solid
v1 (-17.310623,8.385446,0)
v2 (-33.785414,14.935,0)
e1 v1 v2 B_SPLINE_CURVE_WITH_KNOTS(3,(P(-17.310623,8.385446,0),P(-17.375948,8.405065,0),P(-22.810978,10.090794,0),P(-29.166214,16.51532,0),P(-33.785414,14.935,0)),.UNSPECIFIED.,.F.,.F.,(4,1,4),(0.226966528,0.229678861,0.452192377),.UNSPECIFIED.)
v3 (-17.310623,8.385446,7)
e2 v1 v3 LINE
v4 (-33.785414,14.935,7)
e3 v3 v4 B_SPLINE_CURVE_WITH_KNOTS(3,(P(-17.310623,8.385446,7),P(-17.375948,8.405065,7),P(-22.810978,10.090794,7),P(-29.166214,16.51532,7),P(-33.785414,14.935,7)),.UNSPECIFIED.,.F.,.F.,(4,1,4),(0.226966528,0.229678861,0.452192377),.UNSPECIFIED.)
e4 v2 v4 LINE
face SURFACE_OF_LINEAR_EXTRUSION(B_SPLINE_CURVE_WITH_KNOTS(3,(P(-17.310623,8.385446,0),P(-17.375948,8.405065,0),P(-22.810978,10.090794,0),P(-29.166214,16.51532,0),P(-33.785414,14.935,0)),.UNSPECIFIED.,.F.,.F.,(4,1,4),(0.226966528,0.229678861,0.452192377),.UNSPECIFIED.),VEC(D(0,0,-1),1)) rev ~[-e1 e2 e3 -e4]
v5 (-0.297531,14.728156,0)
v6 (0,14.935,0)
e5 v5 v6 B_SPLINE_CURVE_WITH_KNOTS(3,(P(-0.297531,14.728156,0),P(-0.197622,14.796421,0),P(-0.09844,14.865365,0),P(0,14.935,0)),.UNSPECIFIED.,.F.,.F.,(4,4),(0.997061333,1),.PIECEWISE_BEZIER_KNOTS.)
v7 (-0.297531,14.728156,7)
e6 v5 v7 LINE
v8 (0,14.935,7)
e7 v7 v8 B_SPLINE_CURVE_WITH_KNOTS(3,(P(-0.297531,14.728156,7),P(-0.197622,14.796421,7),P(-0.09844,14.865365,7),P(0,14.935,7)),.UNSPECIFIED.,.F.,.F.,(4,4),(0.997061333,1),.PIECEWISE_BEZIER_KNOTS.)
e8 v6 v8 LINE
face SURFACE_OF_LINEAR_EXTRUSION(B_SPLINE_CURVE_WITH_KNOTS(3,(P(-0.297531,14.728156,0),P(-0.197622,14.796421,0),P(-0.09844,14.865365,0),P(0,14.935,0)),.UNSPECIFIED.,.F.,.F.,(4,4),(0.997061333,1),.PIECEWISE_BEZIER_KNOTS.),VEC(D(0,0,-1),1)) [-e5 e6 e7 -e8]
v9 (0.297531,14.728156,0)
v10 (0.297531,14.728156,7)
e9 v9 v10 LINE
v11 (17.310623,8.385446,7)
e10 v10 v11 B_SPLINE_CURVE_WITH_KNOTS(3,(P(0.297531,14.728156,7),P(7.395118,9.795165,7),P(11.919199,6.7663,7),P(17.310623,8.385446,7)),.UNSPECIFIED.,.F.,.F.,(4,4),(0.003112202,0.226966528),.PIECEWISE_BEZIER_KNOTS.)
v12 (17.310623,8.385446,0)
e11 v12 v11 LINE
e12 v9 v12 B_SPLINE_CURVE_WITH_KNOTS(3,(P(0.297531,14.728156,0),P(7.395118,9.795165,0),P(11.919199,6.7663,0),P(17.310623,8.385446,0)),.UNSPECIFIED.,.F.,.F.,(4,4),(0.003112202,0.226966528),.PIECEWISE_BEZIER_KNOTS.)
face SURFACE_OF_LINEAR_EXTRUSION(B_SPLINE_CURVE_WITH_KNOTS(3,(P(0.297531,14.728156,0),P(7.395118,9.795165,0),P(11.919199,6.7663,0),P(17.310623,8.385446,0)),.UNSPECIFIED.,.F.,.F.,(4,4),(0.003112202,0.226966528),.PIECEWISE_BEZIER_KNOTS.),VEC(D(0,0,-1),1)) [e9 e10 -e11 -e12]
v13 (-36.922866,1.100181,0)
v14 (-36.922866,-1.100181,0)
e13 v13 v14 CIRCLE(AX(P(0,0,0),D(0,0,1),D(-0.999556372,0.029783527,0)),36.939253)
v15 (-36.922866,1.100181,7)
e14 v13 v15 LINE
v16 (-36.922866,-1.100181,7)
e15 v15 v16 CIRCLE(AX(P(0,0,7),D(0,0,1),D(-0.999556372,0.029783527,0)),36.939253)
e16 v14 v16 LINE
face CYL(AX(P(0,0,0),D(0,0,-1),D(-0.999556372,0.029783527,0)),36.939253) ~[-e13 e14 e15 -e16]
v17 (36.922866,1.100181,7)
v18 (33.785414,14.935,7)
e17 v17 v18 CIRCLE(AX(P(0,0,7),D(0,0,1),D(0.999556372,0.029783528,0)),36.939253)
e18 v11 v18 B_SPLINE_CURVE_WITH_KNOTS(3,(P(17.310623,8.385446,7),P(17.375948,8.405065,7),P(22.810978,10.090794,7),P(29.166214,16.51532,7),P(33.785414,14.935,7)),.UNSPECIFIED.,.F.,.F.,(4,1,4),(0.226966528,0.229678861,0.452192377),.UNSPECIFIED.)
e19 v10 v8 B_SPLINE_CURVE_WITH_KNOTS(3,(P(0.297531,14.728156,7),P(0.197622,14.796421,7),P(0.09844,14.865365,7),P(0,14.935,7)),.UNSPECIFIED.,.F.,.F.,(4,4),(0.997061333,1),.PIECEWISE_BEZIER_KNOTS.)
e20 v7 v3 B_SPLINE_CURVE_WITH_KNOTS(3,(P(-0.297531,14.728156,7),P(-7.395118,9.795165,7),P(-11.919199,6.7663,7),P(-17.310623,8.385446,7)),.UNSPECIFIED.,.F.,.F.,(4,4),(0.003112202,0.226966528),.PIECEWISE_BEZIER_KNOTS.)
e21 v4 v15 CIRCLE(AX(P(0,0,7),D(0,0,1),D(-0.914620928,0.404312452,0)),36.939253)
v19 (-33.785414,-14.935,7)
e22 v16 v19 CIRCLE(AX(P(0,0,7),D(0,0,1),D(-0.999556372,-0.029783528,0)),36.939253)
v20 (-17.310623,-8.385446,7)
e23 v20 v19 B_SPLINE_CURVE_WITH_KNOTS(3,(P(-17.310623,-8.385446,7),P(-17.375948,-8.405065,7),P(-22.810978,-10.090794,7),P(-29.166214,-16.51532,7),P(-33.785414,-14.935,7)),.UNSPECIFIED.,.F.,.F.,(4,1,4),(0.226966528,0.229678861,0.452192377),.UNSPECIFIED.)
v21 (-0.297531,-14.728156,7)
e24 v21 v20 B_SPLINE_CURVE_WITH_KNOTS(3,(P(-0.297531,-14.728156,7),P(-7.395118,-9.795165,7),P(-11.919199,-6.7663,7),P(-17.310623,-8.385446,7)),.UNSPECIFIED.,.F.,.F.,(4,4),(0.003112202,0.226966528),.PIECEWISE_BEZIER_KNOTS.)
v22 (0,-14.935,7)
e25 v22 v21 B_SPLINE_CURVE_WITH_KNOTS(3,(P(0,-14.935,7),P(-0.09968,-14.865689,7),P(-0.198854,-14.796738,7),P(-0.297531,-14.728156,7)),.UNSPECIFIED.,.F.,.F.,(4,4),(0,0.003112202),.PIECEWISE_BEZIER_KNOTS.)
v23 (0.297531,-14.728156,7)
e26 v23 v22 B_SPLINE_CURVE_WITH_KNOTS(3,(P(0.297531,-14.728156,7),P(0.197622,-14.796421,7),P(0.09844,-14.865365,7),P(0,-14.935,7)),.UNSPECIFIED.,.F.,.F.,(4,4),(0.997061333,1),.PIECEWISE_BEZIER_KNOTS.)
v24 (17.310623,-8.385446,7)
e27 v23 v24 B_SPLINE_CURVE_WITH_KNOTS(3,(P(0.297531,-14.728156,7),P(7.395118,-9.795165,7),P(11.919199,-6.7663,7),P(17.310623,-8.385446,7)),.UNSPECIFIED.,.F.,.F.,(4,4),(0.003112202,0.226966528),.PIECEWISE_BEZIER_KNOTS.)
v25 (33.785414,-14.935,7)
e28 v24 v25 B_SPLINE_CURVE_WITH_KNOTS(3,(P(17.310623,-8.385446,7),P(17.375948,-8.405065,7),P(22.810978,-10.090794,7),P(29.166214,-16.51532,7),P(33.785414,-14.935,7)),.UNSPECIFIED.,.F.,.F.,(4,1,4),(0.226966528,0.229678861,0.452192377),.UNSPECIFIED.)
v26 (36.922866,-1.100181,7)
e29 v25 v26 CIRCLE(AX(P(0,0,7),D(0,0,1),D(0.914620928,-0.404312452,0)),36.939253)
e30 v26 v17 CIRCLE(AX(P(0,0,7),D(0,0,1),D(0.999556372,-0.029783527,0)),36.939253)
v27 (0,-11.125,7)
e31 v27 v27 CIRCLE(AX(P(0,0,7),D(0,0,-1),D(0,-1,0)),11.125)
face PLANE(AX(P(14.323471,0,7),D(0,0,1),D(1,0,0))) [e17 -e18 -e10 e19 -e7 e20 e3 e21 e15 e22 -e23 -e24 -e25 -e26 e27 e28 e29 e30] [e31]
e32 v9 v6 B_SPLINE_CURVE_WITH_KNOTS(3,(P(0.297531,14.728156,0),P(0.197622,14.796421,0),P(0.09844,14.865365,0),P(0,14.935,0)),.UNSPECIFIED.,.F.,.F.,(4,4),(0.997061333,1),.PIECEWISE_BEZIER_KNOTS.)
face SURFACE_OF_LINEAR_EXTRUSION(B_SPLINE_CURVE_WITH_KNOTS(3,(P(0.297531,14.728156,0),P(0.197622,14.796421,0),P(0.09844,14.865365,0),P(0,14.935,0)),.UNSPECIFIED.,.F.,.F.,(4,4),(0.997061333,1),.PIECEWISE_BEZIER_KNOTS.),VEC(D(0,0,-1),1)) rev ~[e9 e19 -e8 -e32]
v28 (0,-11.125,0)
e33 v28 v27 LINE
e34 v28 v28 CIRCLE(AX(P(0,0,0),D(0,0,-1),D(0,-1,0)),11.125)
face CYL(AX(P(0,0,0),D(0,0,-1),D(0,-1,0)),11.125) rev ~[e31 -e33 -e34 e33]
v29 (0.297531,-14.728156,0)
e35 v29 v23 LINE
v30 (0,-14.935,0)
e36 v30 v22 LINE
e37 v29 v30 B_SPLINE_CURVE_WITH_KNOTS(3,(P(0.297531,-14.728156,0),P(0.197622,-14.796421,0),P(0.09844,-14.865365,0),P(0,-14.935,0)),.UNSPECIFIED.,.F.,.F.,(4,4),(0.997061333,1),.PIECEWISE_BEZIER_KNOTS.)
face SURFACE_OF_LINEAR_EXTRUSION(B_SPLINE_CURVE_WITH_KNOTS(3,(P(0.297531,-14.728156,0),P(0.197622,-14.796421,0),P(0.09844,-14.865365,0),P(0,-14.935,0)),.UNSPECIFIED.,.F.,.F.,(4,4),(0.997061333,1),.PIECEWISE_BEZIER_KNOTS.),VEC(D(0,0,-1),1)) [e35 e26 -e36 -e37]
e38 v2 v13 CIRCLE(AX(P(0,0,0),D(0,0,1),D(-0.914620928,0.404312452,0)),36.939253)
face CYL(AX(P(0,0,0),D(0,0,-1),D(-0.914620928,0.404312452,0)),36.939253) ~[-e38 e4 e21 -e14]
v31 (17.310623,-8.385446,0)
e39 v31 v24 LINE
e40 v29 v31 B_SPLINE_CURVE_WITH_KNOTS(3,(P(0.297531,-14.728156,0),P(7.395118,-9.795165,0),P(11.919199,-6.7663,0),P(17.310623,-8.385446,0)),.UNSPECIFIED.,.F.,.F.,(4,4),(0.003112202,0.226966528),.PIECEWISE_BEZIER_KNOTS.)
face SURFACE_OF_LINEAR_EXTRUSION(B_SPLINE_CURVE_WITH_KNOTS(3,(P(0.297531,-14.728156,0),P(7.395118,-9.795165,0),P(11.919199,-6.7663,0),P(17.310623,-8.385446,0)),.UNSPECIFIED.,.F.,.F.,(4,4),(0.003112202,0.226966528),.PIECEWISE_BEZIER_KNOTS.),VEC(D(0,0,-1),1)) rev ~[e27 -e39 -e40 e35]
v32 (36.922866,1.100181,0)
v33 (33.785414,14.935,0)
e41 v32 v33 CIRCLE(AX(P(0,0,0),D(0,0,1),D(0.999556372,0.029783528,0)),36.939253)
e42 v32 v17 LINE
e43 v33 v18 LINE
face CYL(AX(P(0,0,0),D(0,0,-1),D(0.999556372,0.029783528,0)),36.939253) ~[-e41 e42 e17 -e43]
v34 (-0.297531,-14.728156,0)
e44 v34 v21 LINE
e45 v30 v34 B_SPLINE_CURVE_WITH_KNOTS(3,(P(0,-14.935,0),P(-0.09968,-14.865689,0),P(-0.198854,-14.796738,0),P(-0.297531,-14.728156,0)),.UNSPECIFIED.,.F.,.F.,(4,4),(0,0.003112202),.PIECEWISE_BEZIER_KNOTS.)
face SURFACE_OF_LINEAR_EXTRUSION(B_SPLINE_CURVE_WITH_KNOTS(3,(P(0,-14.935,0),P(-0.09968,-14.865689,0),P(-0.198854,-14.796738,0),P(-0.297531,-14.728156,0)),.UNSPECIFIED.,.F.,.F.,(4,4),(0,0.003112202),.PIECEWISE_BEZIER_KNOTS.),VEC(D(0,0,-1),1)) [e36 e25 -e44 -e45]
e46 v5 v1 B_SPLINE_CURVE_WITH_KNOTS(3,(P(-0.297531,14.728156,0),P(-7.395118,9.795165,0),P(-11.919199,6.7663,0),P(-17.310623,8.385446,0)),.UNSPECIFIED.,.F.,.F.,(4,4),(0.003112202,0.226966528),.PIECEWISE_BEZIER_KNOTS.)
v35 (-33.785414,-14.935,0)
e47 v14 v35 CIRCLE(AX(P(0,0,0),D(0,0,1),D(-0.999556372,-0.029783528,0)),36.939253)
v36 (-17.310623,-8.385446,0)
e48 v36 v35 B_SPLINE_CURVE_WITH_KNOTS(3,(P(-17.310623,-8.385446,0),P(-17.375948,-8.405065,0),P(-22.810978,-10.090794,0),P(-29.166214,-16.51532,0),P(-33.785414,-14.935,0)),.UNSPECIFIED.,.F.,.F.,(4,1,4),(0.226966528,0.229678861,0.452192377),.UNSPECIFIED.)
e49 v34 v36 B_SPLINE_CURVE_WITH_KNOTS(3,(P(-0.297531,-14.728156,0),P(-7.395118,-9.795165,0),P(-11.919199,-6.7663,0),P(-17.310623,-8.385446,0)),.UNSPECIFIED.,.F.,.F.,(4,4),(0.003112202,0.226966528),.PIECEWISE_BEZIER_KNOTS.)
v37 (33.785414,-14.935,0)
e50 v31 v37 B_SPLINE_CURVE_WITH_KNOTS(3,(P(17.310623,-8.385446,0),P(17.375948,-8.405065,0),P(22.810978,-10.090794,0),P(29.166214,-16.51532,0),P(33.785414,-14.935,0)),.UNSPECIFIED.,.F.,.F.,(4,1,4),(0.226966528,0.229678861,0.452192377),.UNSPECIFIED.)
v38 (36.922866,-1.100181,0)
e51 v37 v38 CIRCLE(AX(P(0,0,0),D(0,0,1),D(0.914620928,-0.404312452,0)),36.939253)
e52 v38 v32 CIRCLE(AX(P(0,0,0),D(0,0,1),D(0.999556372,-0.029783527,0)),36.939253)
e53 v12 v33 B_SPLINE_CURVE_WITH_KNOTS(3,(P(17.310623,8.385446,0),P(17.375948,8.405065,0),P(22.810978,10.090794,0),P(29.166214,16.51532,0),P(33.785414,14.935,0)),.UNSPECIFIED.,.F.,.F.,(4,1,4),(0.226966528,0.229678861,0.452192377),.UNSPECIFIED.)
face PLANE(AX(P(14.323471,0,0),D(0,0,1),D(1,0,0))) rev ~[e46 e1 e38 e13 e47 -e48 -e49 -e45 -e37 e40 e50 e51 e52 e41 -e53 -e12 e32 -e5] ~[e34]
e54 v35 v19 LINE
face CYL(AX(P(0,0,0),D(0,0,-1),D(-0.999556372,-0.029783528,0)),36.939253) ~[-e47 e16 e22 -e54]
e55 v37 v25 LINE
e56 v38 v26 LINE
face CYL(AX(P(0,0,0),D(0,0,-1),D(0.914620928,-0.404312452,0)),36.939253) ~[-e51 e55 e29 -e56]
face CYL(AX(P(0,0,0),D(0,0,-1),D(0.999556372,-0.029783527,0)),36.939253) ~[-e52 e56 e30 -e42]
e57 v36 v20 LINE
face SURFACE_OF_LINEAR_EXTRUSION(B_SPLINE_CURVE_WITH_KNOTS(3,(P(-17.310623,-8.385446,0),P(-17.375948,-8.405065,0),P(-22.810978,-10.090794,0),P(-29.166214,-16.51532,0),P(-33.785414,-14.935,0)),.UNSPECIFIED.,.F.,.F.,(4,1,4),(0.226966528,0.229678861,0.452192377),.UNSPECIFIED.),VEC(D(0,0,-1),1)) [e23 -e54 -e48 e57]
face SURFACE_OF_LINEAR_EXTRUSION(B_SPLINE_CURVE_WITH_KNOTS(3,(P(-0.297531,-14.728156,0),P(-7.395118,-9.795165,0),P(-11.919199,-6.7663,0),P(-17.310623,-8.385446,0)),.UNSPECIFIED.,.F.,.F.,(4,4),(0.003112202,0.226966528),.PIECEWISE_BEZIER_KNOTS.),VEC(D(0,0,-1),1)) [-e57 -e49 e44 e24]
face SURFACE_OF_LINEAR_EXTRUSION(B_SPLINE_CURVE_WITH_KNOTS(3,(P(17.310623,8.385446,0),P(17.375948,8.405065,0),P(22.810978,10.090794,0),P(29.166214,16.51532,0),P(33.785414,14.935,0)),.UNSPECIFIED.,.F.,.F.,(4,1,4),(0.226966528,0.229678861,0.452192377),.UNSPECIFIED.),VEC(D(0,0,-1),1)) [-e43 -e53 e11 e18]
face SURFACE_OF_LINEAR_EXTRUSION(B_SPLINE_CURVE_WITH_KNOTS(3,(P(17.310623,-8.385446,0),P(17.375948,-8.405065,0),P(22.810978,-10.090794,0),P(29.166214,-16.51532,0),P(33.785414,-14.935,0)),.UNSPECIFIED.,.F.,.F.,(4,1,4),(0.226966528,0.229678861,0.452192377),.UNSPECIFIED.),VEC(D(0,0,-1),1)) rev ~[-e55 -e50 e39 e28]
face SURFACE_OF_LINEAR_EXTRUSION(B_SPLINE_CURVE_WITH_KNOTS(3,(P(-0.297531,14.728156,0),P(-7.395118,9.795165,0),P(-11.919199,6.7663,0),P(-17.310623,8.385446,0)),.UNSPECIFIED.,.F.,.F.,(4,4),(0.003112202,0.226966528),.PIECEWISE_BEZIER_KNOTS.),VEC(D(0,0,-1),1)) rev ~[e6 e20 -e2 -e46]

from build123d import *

# Parameters (mm, degrees)
F1_DEPTH = 7


with BuildPart() as f1:
    # F0 (on Top) → F1 (new body)
    with BuildSketch(Plane.XY):
        with BuildLine():
            ThreePointArc((0, 11.125), (7.8665629407, 7.8665629407), (11.125, 0))
            ThreePointArc((11.125, 0), (7.8665629407, -7.8665629407), (0, -11.125))
            Line((0, -11.125), (0, -14.935))
            add(Edge.make_bspline(
                [(0.2975305523, -14.7281560773), (0.1976224081, -14.7964212888), (0.098439929, -14.8653652618), (0, -14.935)],
                knots=[0.9970613329, 0.9970613329, 0.9970613329, 0.9970613329, 1, 1, 1, 1], degree=3))
            add(Edge.make_bspline(
                [(0.2975305523, -14.7281560773), (7.3951181082, -9.7951650898), (11.9191993362, -6.7662998847), (17.3106230519, -8.3854462868)],
                knots=[0.003112202, 0.003112202, 0.003112202, 0.003112202, 0.226966528, 0.226966528, 0.226966528, 0.226966528], degree=3))
            add(Edge.make_bspline(
                [(36.9228658424, -1.1001812607), (33.3191993332, -4.9864728132), (25.4350438971, -6.457479873), (17.3106230519, -8.3854462868)],
                knots=[0.6774767782, 0.6774767782, 0.6774767782, 0.6774767782, 0.8599164447, 0.8599164447, 0.8599164447, 0.8599164447], degree=3))
            ThreePointArc((36.9228658424, -1.1001812607), (36.9392531167, 0), (36.9228658424, 1.1001812607))
            add(Edge.make_bspline(
                [(36.9228658424, 1.1001812607), (33.3191993332, 4.9864728132), (25.4350438971, 6.457479873), (17.3106230519, 8.3854462868)],
                knots=[0.6774767782, 0.6774767782, 0.6774767782, 0.6774767782, 0.8599164447, 0.8599164447, 0.8599164447, 0.8599164447], degree=3))
            add(Edge.make_bspline(
                [(0.2975305523, 14.7281560773), (7.3951181082, 9.7951650898), (11.9191993362, 6.7662998847), (17.3106230519, 8.3854462868)],
                knots=[0.003112202, 0.003112202, 0.003112202, 0.003112202, 0.226966528, 0.226966528, 0.226966528, 0.226966528], degree=3))
            add(Edge.make_bspline(
                [(0.2975305523, 14.7281560773), (0.1976224081, 14.7964212888), (0.098439929, 14.8653652618), (0, 14.935)],
                knots=[0.9970613329, 0.9970613329, 0.9970613329, 0.9970613329, 1, 1, 1, 1], degree=3))
            Line((0, 14.935), (0, 11.125))
        make_face()
        with BuildLine():
            ThreePointArc((0, -11.125), (-11.125, 0), (0, 11.125))
            Line((0, 11.125), (0, 14.935))
            add(Edge.make_bspline(
                [(-0.2975305523, 14.7281560773), (-0.1976224081, 14.7964212888), (-0.098439929, 14.8653652618), (0, 14.935)],
                knots=[0.9970613329, 0.9970613329, 0.9970613329, 0.9970613329, 1, 1, 1, 1], degree=3))
            add(Edge.make_bspline(
                [(-0.2975305523, 14.7281560773), (-7.3951181082, 9.7951650898), (-11.9191993362, 6.7662998847), (-17.3106230519, 8.3854462868)],
                knots=[0.003112202, 0.003112202, 0.003112202, 0.003112202, 0.226966528, 0.226966528, 0.226966528, 0.226966528], degree=3))
            add(Edge.make_bspline(
                [(-36.9228658424, 1.1001812607), (-33.3191993332, 4.9864728132), (-25.4350438971, 6.457479873), (-17.3106230519, 8.3854462868)],
                knots=[0.6774767782, 0.6774767782, 0.6774767782, 0.6774767782, 0.8599164447, 0.8599164447, 0.8599164447, 0.8599164447], degree=3))
            ThreePointArc((-36.9228658424, 1.1001812607), (-36.9392531167, 0), (-36.9228658424, -1.1001812607))
            add(Edge.make_bspline(
                [(-36.9228658424, -1.1001812607), (-33.3191993332, -4.9864728132), (-25.4350438971, -6.457479873), (-17.3106230519, -8.3854462868)],
                knots=[0.6774767782, 0.6774767782, 0.6774767782, 0.6774767782, 0.8599164447, 0.8599164447, 0.8599164447, 0.8599164447], degree=3))
            add(Edge.make_bspline(
                [(-0.2975305523, -14.7281560773), (-7.3951181082, -9.7951650898), (-11.9191993362, -6.7662998847), (-17.3106230519, -8.3854462868)],
                knots=[0.003112202, 0.003112202, 0.003112202, 0.003112202, 0.226966528, 0.226966528, 0.226966528, 0.226966528], degree=3))
            add(Edge.make_bspline(
                [(-0.2975305523, -14.7281560773), (-0.1976224081, -14.7964212888), (-0.098439929, -14.8653652618), (0, -14.935)],
                knots=[0.9970613329, 0.9970613329, 0.9970613329, 0.9970613329, 1, 1, 1, 1], degree=3))
            Line((0, -14.935), (0, -11.125))
        make_face()
        with BuildLine():
            add(Edge.make_bspline(
                [(0, -14.935), (-0.0996804425, -14.865688897), (-0.1988542112, -14.796738465), (-0.2975305523, -14.7281560773)],
                knots=[0, 0, 0, 0, 0.003112202, 0.003112202, 0.003112202, 0.003112202], degree=3))
            add(Edge.make_bspline(
                [(-0.2975305523, -14.7281560773), (-0.1976224081, -14.7964212888), (-0.098439929, -14.8653652618), (0, -14.935)],
                knots=[0.9970613329, 0.9970613329, 0.9970613329, 0.9970613329, 1, 1, 1, 1], degree=3))
        make_face()
        with BuildLine():
            add(Edge.make_bspline(
                [(-36.9228658424, 1.1001812607), (-33.3191993332, 4.9864728132), (-25.4350438971, 6.457479873), (-17.3106230519, 8.3854462868)],
                knots=[0.6774767782, 0.6774767782, 0.6774767782, 0.6774767782, 0.8599164447, 0.8599164447, 0.8599164447, 0.8599164447], degree=3))
            add(Edge.make_bspline(
                [(-17.3106230519, 8.3854462868), (-17.3759482788, 8.4050646867), (-22.8109780057, 10.0907940795), (-29.1662144452, 16.5153198792), (-33.7854139507, 14.935)],
                knots=[0.226966528, 0.226966528, 0.226966528, 0.226966528, 0.2296788607, 0.4521923767, 0.4521923767, 0.4521923767, 0.4521923767], degree=3))
            ThreePointArc((-33.7854139507, 14.935), (-36.0245160996, 8.1696181434), (-36.9228658424, 1.1001812607))
        make_face()
        with BuildLine():
            add(Edge.make_bspline(
                [(17.3106230519, 8.3854462868), (17.3759482788, 8.4050646867), (22.8109780057, 10.0907940795), (29.1662144452, 16.5153198792), (33.7854139507, 14.935)],
                knots=[0.226966528, 0.226966528, 0.226966528, 0.226966528, 0.2296788607, 0.4521923767, 0.4521923767, 0.4521923767, 0.4521923767], degree=3))
            add(Edge.make_bspline(
                [(36.9228658424, 1.1001812607), (33.3191993332, 4.9864728132), (25.4350438971, 6.457479873), (17.3106230519, 8.3854462868)],
                knots=[0.6774767782, 0.6774767782, 0.6774767782, 0.6774767782, 0.8599164447, 0.8599164447, 0.8599164447, 0.8599164447], degree=3))
            ThreePointArc((36.9228658424, 1.1001812607), (36.0245160996, 8.1696181434), (33.7854139507, 14.935))
        make_face()
        with BuildLine():
            add(Edge.make_bspline(
                [(-17.3106230519, -8.3854462868), (-17.3759482788, -8.4050646867), (-22.8109780057, -10.0907940795), (-29.1662144452, -16.5153198792), (-33.7854139507, -14.935)],
                knots=[0.226966528, 0.226966528, 0.226966528, 0.226966528, 0.2296788607, 0.4521923767, 0.4521923767, 0.4521923767, 0.4521923767], degree=3))
            add(Edge.make_bspline(
                [(-36.9228658424, -1.1001812607), (-33.3191993332, -4.9864728132), (-25.4350438971, -6.457479873), (-17.3106230519, -8.3854462868)],
                knots=[0.6774767782, 0.6774767782, 0.6774767782, 0.6774767782, 0.8599164447, 0.8599164447, 0.8599164447, 0.8599164447], degree=3))
            ThreePointArc((-36.9228658424, -1.1001812607), (-36.0245160996, -8.1696181434), (-33.7854139507, -14.935))
        make_face()
        with BuildLine():
            add(Edge.make_bspline(
                [(36.9228658424, -1.1001812607), (33.3191993332, -4.9864728132), (25.4350438971, -6.457479873), (17.3106230519, -8.3854462868)],
                knots=[0.6774767782, 0.6774767782, 0.6774767782, 0.6774767782, 0.8599164447, 0.8599164447, 0.8599164447, 0.8599164447], degree=3))
            add(Edge.make_bspline(
                [(17.3106230519, -8.3854462868), (17.3759482788, -8.4050646867), (22.8109780057, -10.0907940795), (29.1662144452, -16.5153198792), (33.7854139507, -14.935)],
                knots=[0.226966528, 0.226966528, 0.226966528, 0.226966528, 0.2296788607, 0.4521923767, 0.4521923767, 0.4521923767, 0.4521923767], degree=3))
            ThreePointArc((33.7854139507, -14.935), (36.0245160996, -8.1696181434), (36.9228658424, -1.1001812607))
        make_face()
    extrude(amount=F1_DEPTH)


solid = f1.part
